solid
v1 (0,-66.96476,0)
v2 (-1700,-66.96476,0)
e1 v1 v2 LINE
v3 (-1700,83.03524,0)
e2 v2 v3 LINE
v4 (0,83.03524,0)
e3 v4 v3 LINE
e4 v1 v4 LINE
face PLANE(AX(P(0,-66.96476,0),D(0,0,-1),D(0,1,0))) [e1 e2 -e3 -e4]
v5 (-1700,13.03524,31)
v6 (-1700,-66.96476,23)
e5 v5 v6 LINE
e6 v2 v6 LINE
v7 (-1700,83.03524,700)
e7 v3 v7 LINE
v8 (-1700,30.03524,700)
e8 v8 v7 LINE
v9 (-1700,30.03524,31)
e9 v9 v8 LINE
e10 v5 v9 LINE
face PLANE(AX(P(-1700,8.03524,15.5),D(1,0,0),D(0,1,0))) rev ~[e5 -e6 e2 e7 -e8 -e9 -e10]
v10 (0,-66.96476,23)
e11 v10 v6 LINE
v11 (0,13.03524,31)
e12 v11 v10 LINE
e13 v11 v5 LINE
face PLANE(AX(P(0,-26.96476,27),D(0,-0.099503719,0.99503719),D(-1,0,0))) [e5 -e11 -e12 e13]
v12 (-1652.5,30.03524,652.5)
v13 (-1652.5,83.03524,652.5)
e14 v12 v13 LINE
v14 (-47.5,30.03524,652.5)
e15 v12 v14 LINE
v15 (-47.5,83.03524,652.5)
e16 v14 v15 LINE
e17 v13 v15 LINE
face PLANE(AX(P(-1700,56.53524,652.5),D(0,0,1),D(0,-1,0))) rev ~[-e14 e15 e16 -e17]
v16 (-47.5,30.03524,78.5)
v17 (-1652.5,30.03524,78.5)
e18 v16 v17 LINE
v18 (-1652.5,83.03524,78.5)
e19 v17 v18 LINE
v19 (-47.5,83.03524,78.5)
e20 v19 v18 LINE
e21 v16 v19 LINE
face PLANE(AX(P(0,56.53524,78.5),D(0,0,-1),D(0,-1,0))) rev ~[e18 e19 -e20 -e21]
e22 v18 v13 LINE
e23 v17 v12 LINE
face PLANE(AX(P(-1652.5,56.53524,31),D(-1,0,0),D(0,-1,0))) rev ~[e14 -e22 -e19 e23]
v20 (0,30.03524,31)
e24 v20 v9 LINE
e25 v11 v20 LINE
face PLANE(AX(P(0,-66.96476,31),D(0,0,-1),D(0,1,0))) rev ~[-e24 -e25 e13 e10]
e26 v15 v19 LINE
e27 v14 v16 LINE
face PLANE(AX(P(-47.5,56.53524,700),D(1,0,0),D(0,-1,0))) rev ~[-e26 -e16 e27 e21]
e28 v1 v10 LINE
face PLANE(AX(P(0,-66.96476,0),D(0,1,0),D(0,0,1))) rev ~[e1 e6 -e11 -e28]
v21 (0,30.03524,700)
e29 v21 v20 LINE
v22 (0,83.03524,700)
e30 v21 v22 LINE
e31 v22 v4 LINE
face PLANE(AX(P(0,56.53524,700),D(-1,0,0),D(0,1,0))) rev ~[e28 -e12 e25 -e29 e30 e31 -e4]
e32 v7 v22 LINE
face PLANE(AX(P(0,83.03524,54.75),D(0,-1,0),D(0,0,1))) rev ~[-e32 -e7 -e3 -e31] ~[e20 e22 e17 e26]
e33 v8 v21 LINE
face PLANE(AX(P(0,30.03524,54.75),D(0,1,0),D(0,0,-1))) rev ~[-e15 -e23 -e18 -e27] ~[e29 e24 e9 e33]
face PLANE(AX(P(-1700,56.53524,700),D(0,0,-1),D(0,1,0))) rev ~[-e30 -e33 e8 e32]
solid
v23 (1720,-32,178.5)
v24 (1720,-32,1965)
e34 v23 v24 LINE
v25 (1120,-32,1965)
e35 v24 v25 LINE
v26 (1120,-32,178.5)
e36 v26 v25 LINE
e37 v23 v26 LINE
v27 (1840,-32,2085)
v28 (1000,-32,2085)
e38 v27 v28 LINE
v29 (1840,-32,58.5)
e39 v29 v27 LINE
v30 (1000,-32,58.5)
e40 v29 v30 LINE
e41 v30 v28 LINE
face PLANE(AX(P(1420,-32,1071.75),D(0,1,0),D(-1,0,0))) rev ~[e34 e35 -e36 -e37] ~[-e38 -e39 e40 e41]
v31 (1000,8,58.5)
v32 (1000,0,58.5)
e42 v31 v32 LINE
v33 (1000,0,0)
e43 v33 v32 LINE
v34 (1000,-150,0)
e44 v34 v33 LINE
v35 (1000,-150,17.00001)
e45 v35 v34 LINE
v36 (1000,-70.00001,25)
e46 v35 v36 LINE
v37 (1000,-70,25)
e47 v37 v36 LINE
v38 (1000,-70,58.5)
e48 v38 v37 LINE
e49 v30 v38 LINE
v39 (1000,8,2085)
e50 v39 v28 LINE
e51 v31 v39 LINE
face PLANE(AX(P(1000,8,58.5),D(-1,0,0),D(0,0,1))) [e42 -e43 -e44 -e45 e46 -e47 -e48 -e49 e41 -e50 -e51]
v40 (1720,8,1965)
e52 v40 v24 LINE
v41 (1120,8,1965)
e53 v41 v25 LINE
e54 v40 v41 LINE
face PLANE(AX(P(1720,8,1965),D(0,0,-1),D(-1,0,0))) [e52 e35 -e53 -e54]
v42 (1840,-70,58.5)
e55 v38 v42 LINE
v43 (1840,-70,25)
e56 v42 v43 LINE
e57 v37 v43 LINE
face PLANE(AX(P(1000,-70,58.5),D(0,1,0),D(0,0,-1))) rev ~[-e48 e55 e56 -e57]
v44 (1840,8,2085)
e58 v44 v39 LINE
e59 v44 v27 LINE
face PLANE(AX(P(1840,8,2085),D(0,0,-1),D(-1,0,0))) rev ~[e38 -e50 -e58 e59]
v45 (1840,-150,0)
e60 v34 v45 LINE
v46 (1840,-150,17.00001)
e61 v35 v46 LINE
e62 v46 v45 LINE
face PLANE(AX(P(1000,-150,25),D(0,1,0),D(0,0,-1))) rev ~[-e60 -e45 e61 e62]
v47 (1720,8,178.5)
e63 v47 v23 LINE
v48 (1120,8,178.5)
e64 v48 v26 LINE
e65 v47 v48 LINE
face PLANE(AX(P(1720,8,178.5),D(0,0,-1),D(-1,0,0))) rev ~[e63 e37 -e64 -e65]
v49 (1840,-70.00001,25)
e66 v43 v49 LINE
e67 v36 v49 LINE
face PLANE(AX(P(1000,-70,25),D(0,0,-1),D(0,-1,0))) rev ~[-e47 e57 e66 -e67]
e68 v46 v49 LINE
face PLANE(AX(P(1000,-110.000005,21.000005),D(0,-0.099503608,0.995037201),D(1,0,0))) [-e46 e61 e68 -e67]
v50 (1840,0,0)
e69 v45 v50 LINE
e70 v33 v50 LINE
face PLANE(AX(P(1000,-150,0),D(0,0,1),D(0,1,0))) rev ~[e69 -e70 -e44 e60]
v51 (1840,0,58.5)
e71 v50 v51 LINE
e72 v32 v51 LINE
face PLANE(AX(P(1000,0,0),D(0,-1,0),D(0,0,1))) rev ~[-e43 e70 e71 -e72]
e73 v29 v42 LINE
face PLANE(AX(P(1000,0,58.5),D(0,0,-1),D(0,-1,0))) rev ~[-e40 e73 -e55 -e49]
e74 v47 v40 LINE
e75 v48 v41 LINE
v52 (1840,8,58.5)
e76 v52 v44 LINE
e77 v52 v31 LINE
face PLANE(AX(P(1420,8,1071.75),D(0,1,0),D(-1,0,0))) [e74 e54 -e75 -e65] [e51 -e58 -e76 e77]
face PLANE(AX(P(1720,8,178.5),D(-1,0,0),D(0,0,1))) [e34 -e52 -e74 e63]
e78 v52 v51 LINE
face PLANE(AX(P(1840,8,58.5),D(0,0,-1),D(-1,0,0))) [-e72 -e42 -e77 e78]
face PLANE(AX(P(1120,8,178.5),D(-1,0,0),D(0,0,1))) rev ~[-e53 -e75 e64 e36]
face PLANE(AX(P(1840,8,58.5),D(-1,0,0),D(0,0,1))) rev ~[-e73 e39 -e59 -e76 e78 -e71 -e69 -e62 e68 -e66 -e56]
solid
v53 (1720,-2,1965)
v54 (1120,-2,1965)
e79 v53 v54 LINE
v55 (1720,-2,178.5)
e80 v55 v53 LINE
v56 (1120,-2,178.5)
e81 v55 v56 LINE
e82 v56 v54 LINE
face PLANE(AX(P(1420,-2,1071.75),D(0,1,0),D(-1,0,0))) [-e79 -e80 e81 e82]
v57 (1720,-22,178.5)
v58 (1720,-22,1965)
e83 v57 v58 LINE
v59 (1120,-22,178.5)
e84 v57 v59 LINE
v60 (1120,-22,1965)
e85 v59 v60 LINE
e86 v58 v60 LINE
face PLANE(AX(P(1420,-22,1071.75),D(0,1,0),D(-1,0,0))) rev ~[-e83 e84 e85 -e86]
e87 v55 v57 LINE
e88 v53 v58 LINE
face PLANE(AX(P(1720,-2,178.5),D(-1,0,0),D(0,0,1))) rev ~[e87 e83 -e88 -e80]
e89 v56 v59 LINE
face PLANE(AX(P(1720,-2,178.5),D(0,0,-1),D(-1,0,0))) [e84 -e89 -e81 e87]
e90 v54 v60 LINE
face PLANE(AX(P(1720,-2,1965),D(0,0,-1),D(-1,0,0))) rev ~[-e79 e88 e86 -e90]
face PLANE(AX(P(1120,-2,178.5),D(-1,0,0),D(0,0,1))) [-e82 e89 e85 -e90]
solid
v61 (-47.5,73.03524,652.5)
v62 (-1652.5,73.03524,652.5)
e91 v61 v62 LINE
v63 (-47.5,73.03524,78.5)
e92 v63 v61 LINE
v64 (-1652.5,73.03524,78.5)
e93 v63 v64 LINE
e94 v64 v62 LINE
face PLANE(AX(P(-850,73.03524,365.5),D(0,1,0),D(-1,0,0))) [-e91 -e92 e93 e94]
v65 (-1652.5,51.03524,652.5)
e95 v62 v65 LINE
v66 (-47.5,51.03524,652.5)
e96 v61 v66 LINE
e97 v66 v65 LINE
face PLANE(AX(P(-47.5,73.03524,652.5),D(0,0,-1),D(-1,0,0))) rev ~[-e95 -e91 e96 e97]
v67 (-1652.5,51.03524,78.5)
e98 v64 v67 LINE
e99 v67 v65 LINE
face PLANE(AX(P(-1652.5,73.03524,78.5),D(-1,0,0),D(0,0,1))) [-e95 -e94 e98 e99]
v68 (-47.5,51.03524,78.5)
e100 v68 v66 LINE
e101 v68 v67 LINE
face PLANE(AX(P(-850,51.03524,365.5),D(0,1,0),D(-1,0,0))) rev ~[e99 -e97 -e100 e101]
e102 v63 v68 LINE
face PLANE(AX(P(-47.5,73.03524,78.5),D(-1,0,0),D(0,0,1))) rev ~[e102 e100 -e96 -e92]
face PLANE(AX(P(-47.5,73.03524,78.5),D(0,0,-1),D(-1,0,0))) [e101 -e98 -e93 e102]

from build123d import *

# Parameters (mm, degrees)
F0_W      = 150
F0_H      = 31
F1_DEPTH  = 1700
F3_W      = 53
F3_H      = 47.5
F6_W      = 1605
F6_H      = 574
F7_DEPTH  = 22
F10_DEPTH = 840
F12_W     = 840
F12_H     = 2026.5
F12_W_2   = 600
F12_H_2   = 1786.5
F13_DEPTH = 40
F15_W     = 600
F15_H     = 1786.5
F16_DEPTH = 20
F17_SIZE2 = 8
F17_SIZE  = 80
F18_SIZE2 = 79.99999
F18_SIZE  = 7.99999


# Not quite as in the source:
# - a fillet or chamfer is up to 0.001 mm smaller than in the source, because OpenCascade refuses the exact size


with BuildPart() as f1:
    # F0 (on Right) → F1 (new body)
    with BuildSketch(Plane.YZ):
        with Locations((8.0352395773, 15.5)):
            Rectangle(F0_W, F0_H)
    extrude(amount=-F1_DEPTH)

    # F4: sweep along a path in F2
    with BuildLine(Plane(origin=(0, 83.0352395773, 0), x_dir=(-1, 0, 0), z_dir=(0, 1, 0))) as f4_path:
        Line((0, 31), (1700, 31))
        Line((1700, 31), (1700, 700))
        Line((1700, 700), (0, 700))
        Line((0, 700), (0, 31))
    # F3 (on Right) → F4 (sweep)
    with BuildSketch(Plane.YZ):
        with Locations((56.5352395773, 54.75)):
            Rectangle(F3_W, F3_H)
    sweep(path=f4_path.line, transition=Transition.RIGHT)

    # F17
    f17_edges = [f1.edges().sort_by_distance(p)[0] for p in [
        (-850, -66.96476, 31),
    ]]
    f17_side = f1.faces().sort_by_distance((-850, -18.46476, 31))[0]
    chamfer(f17_edges, length=F17_SIZE, length2=F17_SIZE2, reference=f17_side)


with BuildPart() as f7:
    # F6 (on offset) → F7 (new body)
    with BuildSketch(Plane(origin=(0, 73.0352395773, 0), x_dir=(-1, 0, 0), z_dir=(0, 1, 0))):
        with Locations((850, 365.5)):
            Rectangle(F6_W, F6_H)
    extrude(amount=-F7_DEPTH)


with BuildPart() as f10:
    # F9 (on offset) → F10 (new body)
    with BuildSketch(Plane.YZ.offset(1000)):
        Polygon((-150, 0), (0, 0), (0, 25), (0, 58.5), (-70, 58.5), (-70, 25), (-150, 25), align=None)
    extrude(amount=F10_DEPTH)

    # F12 (on offset) → F13 (join)
    with BuildSketch(Plane(origin=(0, 8, 0), x_dir=(-1, 0, 0), z_dir=(0, 1, 0))):
        with Locations((-1420, 1071.75)):
            Rectangle(F12_W, F12_H)
        with Locations((-1420, 1071.75)):
            Rectangle(F12_W_2, F12_H_2, mode=Mode.SUBTRACT)
    extrude(amount=-F13_DEPTH)

    # F18 (size 8 and 80 in the source; OpenCascade refuses exactly that, so slightly less here)
    f18_edges = [f10.edges().sort_by_distance(p)[0] for p in [
        (1420, -150, 25),
    ]]
    f18_side = f10.faces().sort_by_distance((1420, -150, 12.5))[0]
    chamfer(f18_edges, length=F18_SIZE, length2=F18_SIZE2, reference=f18_side)


with BuildPart() as f16:
    # F15 (on offset) → F16 (new body)
    with BuildSketch(Plane(origin=(0, -2, 0), x_dir=(-1, 0, 0), z_dir=(0, 1, 0))):
        with Locations((-1420, 1071.75)):
            Rectangle(F15_W, F15_H)
    extrude(amount=-F16_DEPTH)


solid = Compound([f1.part, f7.part, f10.part, f16.part])
